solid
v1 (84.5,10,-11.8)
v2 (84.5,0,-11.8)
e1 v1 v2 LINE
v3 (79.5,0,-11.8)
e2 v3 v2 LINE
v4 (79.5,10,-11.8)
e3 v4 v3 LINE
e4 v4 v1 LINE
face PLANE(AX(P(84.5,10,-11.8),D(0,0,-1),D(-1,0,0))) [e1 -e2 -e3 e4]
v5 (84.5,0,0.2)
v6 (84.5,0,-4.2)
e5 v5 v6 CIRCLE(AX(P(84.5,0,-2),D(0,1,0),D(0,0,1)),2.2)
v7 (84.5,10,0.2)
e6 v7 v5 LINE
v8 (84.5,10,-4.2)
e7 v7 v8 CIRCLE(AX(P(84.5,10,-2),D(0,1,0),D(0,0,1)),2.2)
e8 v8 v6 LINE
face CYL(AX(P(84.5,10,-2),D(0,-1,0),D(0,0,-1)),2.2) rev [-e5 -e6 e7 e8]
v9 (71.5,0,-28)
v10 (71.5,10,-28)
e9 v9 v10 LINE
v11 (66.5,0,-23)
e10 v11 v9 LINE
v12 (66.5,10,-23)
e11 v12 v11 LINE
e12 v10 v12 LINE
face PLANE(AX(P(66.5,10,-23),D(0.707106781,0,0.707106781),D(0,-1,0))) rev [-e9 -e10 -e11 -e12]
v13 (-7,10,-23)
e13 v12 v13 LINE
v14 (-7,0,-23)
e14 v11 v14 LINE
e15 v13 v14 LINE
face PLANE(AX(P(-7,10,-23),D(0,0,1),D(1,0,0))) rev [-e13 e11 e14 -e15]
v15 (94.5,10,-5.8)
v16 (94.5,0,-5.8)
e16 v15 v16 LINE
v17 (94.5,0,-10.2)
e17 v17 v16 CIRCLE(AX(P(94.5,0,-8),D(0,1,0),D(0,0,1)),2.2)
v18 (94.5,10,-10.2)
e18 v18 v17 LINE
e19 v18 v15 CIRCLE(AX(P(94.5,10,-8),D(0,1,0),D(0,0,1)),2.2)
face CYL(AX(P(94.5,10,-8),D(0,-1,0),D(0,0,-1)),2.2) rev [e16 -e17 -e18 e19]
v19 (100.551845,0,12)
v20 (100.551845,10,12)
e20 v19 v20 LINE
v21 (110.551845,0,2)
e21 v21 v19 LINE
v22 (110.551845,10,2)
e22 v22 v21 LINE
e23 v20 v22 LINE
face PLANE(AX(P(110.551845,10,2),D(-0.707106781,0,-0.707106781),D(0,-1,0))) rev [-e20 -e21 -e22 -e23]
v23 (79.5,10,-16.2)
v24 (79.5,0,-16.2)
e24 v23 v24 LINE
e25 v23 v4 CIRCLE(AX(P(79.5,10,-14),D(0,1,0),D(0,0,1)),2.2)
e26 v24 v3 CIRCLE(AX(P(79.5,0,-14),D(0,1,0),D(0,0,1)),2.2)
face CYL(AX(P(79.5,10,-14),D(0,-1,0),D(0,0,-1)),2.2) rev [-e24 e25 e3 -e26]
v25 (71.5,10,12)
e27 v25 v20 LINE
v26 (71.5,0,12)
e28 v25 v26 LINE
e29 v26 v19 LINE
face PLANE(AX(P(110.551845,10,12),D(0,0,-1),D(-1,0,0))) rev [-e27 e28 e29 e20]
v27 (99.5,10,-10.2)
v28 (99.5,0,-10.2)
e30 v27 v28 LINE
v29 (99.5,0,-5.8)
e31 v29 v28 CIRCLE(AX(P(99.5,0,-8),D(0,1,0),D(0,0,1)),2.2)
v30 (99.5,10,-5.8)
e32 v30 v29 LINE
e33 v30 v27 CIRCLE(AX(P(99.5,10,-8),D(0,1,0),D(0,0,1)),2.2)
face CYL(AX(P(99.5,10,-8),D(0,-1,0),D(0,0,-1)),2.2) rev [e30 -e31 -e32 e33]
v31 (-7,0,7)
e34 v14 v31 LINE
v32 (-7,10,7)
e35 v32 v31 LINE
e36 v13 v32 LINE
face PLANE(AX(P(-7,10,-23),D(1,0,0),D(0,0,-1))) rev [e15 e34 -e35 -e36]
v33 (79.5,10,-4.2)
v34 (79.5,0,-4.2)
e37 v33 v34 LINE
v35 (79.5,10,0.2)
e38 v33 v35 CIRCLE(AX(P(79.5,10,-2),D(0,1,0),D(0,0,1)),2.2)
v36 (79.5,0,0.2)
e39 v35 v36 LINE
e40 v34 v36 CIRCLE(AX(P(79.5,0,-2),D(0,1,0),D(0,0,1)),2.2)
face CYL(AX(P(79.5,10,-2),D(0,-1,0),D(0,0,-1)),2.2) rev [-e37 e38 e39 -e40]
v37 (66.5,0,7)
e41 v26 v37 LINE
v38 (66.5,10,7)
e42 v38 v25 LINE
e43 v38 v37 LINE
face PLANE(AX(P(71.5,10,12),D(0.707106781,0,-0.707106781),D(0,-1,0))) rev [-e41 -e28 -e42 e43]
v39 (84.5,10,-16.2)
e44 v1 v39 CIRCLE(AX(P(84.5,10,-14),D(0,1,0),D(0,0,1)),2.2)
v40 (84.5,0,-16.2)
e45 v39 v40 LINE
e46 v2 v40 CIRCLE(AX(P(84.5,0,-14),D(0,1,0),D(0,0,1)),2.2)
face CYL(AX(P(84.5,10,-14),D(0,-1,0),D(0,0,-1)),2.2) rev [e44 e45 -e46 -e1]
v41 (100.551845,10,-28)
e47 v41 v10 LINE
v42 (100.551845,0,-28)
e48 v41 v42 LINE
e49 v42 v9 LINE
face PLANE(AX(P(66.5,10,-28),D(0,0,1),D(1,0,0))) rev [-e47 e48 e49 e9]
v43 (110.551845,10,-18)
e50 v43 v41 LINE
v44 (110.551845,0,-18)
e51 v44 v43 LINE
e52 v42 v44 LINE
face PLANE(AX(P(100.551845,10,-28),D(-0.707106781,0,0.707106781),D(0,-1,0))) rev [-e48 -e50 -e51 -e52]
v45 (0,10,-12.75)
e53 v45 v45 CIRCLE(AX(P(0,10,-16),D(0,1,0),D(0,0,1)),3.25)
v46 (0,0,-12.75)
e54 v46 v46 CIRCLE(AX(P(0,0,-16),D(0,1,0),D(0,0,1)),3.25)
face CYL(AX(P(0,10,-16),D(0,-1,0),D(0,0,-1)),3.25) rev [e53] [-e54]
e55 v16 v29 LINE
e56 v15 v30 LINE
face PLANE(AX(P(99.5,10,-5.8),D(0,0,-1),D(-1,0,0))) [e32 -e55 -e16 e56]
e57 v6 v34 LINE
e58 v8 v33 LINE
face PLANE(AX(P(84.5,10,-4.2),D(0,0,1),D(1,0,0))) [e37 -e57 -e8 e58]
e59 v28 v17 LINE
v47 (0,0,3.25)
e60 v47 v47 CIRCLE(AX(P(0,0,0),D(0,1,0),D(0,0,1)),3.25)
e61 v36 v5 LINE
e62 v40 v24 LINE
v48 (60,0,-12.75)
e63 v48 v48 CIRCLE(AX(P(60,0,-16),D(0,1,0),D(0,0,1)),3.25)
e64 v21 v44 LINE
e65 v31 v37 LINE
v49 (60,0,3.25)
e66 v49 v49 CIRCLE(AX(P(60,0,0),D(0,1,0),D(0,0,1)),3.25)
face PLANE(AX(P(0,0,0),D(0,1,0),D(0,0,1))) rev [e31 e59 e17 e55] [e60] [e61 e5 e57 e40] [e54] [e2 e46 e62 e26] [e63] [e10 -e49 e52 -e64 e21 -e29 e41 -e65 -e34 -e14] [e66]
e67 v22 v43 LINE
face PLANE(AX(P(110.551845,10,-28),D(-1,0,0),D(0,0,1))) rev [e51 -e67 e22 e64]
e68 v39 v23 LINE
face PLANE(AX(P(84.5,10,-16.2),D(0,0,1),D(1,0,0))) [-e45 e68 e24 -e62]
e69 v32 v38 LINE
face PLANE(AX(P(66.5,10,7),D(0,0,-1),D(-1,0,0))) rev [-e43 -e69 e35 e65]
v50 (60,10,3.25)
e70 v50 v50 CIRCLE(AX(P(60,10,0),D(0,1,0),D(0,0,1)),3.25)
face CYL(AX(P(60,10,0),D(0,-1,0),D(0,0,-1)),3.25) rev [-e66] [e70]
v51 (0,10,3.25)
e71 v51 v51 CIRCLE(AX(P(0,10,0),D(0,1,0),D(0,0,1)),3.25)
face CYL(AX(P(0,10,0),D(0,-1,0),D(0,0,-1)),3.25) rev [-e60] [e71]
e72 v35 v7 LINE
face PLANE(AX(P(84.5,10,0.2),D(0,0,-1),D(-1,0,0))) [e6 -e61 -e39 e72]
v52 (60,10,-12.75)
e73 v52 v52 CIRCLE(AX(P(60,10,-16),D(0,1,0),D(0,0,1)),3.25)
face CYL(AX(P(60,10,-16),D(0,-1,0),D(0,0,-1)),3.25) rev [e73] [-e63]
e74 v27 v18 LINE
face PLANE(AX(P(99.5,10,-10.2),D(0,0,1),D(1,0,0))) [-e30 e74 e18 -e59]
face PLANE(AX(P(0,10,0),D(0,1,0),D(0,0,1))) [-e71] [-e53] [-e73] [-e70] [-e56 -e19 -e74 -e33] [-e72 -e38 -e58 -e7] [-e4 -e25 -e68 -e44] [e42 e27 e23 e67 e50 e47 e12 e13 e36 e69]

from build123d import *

# Parameters (mm, degrees)
SKETCH1_R           = 3.25
BOSS_EXTRUDE1_DEPTH = 10
CHAMFER1_SIZE       = 10
CHAMFER2_SIZE       = 5


with BuildPart() as part:
    # Sketch1 → Boss-Extrude1 (new body)
    with BuildSketch(Plane(origin=(0, 0, 0), x_dir=(1, 0, 0), z_dir=(0, 1, 0))):
        Polygon((-7, 23), (-7, -7), (66.5, -7), (66.5, -12), (110.55184454, -12), (110.55184454, 28), (66.5, 28), (66.5, 23), align=None)
        with Locations(Location((0, 0, 0), (0, 0, 270))):
            Circle(SKETCH1_R, mode=Mode.SUBTRACT)
        with Locations(Location((0, 16, 0), (0, 0, 270))):
            Circle(SKETCH1_R, mode=Mode.SUBTRACT)
        with Locations(Location((60, 0, 0), (0, 0, 270))):
            Circle(SKETCH1_R, mode=Mode.SUBTRACT)
        with Locations(Location((60, 16, 0), (0, 0, 270))):
            Circle(SKETCH1_R, mode=Mode.SUBTRACT)
        with BuildLine():
            Line((99.5, 5.8), (94.5, 5.8))
            ThreePointArc((94.5, 5.8), (92.3, 8), (94.5, 10.2))
            Line((94.5, 10.2), (99.5, 10.2))
            ThreePointArc((99.5, 10.2), (101.7, 8), (99.5, 5.8))
        make_face(mode=Mode.SUBTRACT)
        with BuildLine():
            Line((84.5, 11.8), (79.5, 11.8))
            ThreePointArc((79.5, 11.8), (77.3, 14), (79.5, 16.2))
            Line((79.5, 16.2), (84.5, 16.2))
            ThreePointArc((84.5, 16.2), (86.7, 14), (84.5, 11.8))
        make_face(mode=Mode.SUBTRACT)
        with BuildLine():
            Line((84.5, -0.2), (79.5, -0.2))
            ThreePointArc((79.5, -0.2), (77.3, 2), (79.5, 4.2))
            Line((79.5, 4.2), (84.5, 4.2))
            ThreePointArc((84.5, 4.2), (86.7, 2), (84.5, -0.2))
        make_face(mode=Mode.SUBTRACT)
    extrude(amount=BOSS_EXTRUDE1_DEPTH)

    # Chamfer1
    chamfer1_edges = [part.edges().sort_by_distance(p)[0] for p in [
        (110.55184454, 5, -28),
        (110.55184454, 5, 12),
    ]]
    chamfer(chamfer1_edges, length=CHAMFER1_SIZE)

    # Chamfer2
    chamfer2_edges = [part.edges().sort_by_distance(p)[0] for p in [
        (66.5, 5, 12),
        (66.5, 5, -28),
    ]]
    chamfer(chamfer2_edges, length=CHAMFER2_SIZE - 0.0001)  # a hair under: the kernel refuses the full size


solid = part.part
